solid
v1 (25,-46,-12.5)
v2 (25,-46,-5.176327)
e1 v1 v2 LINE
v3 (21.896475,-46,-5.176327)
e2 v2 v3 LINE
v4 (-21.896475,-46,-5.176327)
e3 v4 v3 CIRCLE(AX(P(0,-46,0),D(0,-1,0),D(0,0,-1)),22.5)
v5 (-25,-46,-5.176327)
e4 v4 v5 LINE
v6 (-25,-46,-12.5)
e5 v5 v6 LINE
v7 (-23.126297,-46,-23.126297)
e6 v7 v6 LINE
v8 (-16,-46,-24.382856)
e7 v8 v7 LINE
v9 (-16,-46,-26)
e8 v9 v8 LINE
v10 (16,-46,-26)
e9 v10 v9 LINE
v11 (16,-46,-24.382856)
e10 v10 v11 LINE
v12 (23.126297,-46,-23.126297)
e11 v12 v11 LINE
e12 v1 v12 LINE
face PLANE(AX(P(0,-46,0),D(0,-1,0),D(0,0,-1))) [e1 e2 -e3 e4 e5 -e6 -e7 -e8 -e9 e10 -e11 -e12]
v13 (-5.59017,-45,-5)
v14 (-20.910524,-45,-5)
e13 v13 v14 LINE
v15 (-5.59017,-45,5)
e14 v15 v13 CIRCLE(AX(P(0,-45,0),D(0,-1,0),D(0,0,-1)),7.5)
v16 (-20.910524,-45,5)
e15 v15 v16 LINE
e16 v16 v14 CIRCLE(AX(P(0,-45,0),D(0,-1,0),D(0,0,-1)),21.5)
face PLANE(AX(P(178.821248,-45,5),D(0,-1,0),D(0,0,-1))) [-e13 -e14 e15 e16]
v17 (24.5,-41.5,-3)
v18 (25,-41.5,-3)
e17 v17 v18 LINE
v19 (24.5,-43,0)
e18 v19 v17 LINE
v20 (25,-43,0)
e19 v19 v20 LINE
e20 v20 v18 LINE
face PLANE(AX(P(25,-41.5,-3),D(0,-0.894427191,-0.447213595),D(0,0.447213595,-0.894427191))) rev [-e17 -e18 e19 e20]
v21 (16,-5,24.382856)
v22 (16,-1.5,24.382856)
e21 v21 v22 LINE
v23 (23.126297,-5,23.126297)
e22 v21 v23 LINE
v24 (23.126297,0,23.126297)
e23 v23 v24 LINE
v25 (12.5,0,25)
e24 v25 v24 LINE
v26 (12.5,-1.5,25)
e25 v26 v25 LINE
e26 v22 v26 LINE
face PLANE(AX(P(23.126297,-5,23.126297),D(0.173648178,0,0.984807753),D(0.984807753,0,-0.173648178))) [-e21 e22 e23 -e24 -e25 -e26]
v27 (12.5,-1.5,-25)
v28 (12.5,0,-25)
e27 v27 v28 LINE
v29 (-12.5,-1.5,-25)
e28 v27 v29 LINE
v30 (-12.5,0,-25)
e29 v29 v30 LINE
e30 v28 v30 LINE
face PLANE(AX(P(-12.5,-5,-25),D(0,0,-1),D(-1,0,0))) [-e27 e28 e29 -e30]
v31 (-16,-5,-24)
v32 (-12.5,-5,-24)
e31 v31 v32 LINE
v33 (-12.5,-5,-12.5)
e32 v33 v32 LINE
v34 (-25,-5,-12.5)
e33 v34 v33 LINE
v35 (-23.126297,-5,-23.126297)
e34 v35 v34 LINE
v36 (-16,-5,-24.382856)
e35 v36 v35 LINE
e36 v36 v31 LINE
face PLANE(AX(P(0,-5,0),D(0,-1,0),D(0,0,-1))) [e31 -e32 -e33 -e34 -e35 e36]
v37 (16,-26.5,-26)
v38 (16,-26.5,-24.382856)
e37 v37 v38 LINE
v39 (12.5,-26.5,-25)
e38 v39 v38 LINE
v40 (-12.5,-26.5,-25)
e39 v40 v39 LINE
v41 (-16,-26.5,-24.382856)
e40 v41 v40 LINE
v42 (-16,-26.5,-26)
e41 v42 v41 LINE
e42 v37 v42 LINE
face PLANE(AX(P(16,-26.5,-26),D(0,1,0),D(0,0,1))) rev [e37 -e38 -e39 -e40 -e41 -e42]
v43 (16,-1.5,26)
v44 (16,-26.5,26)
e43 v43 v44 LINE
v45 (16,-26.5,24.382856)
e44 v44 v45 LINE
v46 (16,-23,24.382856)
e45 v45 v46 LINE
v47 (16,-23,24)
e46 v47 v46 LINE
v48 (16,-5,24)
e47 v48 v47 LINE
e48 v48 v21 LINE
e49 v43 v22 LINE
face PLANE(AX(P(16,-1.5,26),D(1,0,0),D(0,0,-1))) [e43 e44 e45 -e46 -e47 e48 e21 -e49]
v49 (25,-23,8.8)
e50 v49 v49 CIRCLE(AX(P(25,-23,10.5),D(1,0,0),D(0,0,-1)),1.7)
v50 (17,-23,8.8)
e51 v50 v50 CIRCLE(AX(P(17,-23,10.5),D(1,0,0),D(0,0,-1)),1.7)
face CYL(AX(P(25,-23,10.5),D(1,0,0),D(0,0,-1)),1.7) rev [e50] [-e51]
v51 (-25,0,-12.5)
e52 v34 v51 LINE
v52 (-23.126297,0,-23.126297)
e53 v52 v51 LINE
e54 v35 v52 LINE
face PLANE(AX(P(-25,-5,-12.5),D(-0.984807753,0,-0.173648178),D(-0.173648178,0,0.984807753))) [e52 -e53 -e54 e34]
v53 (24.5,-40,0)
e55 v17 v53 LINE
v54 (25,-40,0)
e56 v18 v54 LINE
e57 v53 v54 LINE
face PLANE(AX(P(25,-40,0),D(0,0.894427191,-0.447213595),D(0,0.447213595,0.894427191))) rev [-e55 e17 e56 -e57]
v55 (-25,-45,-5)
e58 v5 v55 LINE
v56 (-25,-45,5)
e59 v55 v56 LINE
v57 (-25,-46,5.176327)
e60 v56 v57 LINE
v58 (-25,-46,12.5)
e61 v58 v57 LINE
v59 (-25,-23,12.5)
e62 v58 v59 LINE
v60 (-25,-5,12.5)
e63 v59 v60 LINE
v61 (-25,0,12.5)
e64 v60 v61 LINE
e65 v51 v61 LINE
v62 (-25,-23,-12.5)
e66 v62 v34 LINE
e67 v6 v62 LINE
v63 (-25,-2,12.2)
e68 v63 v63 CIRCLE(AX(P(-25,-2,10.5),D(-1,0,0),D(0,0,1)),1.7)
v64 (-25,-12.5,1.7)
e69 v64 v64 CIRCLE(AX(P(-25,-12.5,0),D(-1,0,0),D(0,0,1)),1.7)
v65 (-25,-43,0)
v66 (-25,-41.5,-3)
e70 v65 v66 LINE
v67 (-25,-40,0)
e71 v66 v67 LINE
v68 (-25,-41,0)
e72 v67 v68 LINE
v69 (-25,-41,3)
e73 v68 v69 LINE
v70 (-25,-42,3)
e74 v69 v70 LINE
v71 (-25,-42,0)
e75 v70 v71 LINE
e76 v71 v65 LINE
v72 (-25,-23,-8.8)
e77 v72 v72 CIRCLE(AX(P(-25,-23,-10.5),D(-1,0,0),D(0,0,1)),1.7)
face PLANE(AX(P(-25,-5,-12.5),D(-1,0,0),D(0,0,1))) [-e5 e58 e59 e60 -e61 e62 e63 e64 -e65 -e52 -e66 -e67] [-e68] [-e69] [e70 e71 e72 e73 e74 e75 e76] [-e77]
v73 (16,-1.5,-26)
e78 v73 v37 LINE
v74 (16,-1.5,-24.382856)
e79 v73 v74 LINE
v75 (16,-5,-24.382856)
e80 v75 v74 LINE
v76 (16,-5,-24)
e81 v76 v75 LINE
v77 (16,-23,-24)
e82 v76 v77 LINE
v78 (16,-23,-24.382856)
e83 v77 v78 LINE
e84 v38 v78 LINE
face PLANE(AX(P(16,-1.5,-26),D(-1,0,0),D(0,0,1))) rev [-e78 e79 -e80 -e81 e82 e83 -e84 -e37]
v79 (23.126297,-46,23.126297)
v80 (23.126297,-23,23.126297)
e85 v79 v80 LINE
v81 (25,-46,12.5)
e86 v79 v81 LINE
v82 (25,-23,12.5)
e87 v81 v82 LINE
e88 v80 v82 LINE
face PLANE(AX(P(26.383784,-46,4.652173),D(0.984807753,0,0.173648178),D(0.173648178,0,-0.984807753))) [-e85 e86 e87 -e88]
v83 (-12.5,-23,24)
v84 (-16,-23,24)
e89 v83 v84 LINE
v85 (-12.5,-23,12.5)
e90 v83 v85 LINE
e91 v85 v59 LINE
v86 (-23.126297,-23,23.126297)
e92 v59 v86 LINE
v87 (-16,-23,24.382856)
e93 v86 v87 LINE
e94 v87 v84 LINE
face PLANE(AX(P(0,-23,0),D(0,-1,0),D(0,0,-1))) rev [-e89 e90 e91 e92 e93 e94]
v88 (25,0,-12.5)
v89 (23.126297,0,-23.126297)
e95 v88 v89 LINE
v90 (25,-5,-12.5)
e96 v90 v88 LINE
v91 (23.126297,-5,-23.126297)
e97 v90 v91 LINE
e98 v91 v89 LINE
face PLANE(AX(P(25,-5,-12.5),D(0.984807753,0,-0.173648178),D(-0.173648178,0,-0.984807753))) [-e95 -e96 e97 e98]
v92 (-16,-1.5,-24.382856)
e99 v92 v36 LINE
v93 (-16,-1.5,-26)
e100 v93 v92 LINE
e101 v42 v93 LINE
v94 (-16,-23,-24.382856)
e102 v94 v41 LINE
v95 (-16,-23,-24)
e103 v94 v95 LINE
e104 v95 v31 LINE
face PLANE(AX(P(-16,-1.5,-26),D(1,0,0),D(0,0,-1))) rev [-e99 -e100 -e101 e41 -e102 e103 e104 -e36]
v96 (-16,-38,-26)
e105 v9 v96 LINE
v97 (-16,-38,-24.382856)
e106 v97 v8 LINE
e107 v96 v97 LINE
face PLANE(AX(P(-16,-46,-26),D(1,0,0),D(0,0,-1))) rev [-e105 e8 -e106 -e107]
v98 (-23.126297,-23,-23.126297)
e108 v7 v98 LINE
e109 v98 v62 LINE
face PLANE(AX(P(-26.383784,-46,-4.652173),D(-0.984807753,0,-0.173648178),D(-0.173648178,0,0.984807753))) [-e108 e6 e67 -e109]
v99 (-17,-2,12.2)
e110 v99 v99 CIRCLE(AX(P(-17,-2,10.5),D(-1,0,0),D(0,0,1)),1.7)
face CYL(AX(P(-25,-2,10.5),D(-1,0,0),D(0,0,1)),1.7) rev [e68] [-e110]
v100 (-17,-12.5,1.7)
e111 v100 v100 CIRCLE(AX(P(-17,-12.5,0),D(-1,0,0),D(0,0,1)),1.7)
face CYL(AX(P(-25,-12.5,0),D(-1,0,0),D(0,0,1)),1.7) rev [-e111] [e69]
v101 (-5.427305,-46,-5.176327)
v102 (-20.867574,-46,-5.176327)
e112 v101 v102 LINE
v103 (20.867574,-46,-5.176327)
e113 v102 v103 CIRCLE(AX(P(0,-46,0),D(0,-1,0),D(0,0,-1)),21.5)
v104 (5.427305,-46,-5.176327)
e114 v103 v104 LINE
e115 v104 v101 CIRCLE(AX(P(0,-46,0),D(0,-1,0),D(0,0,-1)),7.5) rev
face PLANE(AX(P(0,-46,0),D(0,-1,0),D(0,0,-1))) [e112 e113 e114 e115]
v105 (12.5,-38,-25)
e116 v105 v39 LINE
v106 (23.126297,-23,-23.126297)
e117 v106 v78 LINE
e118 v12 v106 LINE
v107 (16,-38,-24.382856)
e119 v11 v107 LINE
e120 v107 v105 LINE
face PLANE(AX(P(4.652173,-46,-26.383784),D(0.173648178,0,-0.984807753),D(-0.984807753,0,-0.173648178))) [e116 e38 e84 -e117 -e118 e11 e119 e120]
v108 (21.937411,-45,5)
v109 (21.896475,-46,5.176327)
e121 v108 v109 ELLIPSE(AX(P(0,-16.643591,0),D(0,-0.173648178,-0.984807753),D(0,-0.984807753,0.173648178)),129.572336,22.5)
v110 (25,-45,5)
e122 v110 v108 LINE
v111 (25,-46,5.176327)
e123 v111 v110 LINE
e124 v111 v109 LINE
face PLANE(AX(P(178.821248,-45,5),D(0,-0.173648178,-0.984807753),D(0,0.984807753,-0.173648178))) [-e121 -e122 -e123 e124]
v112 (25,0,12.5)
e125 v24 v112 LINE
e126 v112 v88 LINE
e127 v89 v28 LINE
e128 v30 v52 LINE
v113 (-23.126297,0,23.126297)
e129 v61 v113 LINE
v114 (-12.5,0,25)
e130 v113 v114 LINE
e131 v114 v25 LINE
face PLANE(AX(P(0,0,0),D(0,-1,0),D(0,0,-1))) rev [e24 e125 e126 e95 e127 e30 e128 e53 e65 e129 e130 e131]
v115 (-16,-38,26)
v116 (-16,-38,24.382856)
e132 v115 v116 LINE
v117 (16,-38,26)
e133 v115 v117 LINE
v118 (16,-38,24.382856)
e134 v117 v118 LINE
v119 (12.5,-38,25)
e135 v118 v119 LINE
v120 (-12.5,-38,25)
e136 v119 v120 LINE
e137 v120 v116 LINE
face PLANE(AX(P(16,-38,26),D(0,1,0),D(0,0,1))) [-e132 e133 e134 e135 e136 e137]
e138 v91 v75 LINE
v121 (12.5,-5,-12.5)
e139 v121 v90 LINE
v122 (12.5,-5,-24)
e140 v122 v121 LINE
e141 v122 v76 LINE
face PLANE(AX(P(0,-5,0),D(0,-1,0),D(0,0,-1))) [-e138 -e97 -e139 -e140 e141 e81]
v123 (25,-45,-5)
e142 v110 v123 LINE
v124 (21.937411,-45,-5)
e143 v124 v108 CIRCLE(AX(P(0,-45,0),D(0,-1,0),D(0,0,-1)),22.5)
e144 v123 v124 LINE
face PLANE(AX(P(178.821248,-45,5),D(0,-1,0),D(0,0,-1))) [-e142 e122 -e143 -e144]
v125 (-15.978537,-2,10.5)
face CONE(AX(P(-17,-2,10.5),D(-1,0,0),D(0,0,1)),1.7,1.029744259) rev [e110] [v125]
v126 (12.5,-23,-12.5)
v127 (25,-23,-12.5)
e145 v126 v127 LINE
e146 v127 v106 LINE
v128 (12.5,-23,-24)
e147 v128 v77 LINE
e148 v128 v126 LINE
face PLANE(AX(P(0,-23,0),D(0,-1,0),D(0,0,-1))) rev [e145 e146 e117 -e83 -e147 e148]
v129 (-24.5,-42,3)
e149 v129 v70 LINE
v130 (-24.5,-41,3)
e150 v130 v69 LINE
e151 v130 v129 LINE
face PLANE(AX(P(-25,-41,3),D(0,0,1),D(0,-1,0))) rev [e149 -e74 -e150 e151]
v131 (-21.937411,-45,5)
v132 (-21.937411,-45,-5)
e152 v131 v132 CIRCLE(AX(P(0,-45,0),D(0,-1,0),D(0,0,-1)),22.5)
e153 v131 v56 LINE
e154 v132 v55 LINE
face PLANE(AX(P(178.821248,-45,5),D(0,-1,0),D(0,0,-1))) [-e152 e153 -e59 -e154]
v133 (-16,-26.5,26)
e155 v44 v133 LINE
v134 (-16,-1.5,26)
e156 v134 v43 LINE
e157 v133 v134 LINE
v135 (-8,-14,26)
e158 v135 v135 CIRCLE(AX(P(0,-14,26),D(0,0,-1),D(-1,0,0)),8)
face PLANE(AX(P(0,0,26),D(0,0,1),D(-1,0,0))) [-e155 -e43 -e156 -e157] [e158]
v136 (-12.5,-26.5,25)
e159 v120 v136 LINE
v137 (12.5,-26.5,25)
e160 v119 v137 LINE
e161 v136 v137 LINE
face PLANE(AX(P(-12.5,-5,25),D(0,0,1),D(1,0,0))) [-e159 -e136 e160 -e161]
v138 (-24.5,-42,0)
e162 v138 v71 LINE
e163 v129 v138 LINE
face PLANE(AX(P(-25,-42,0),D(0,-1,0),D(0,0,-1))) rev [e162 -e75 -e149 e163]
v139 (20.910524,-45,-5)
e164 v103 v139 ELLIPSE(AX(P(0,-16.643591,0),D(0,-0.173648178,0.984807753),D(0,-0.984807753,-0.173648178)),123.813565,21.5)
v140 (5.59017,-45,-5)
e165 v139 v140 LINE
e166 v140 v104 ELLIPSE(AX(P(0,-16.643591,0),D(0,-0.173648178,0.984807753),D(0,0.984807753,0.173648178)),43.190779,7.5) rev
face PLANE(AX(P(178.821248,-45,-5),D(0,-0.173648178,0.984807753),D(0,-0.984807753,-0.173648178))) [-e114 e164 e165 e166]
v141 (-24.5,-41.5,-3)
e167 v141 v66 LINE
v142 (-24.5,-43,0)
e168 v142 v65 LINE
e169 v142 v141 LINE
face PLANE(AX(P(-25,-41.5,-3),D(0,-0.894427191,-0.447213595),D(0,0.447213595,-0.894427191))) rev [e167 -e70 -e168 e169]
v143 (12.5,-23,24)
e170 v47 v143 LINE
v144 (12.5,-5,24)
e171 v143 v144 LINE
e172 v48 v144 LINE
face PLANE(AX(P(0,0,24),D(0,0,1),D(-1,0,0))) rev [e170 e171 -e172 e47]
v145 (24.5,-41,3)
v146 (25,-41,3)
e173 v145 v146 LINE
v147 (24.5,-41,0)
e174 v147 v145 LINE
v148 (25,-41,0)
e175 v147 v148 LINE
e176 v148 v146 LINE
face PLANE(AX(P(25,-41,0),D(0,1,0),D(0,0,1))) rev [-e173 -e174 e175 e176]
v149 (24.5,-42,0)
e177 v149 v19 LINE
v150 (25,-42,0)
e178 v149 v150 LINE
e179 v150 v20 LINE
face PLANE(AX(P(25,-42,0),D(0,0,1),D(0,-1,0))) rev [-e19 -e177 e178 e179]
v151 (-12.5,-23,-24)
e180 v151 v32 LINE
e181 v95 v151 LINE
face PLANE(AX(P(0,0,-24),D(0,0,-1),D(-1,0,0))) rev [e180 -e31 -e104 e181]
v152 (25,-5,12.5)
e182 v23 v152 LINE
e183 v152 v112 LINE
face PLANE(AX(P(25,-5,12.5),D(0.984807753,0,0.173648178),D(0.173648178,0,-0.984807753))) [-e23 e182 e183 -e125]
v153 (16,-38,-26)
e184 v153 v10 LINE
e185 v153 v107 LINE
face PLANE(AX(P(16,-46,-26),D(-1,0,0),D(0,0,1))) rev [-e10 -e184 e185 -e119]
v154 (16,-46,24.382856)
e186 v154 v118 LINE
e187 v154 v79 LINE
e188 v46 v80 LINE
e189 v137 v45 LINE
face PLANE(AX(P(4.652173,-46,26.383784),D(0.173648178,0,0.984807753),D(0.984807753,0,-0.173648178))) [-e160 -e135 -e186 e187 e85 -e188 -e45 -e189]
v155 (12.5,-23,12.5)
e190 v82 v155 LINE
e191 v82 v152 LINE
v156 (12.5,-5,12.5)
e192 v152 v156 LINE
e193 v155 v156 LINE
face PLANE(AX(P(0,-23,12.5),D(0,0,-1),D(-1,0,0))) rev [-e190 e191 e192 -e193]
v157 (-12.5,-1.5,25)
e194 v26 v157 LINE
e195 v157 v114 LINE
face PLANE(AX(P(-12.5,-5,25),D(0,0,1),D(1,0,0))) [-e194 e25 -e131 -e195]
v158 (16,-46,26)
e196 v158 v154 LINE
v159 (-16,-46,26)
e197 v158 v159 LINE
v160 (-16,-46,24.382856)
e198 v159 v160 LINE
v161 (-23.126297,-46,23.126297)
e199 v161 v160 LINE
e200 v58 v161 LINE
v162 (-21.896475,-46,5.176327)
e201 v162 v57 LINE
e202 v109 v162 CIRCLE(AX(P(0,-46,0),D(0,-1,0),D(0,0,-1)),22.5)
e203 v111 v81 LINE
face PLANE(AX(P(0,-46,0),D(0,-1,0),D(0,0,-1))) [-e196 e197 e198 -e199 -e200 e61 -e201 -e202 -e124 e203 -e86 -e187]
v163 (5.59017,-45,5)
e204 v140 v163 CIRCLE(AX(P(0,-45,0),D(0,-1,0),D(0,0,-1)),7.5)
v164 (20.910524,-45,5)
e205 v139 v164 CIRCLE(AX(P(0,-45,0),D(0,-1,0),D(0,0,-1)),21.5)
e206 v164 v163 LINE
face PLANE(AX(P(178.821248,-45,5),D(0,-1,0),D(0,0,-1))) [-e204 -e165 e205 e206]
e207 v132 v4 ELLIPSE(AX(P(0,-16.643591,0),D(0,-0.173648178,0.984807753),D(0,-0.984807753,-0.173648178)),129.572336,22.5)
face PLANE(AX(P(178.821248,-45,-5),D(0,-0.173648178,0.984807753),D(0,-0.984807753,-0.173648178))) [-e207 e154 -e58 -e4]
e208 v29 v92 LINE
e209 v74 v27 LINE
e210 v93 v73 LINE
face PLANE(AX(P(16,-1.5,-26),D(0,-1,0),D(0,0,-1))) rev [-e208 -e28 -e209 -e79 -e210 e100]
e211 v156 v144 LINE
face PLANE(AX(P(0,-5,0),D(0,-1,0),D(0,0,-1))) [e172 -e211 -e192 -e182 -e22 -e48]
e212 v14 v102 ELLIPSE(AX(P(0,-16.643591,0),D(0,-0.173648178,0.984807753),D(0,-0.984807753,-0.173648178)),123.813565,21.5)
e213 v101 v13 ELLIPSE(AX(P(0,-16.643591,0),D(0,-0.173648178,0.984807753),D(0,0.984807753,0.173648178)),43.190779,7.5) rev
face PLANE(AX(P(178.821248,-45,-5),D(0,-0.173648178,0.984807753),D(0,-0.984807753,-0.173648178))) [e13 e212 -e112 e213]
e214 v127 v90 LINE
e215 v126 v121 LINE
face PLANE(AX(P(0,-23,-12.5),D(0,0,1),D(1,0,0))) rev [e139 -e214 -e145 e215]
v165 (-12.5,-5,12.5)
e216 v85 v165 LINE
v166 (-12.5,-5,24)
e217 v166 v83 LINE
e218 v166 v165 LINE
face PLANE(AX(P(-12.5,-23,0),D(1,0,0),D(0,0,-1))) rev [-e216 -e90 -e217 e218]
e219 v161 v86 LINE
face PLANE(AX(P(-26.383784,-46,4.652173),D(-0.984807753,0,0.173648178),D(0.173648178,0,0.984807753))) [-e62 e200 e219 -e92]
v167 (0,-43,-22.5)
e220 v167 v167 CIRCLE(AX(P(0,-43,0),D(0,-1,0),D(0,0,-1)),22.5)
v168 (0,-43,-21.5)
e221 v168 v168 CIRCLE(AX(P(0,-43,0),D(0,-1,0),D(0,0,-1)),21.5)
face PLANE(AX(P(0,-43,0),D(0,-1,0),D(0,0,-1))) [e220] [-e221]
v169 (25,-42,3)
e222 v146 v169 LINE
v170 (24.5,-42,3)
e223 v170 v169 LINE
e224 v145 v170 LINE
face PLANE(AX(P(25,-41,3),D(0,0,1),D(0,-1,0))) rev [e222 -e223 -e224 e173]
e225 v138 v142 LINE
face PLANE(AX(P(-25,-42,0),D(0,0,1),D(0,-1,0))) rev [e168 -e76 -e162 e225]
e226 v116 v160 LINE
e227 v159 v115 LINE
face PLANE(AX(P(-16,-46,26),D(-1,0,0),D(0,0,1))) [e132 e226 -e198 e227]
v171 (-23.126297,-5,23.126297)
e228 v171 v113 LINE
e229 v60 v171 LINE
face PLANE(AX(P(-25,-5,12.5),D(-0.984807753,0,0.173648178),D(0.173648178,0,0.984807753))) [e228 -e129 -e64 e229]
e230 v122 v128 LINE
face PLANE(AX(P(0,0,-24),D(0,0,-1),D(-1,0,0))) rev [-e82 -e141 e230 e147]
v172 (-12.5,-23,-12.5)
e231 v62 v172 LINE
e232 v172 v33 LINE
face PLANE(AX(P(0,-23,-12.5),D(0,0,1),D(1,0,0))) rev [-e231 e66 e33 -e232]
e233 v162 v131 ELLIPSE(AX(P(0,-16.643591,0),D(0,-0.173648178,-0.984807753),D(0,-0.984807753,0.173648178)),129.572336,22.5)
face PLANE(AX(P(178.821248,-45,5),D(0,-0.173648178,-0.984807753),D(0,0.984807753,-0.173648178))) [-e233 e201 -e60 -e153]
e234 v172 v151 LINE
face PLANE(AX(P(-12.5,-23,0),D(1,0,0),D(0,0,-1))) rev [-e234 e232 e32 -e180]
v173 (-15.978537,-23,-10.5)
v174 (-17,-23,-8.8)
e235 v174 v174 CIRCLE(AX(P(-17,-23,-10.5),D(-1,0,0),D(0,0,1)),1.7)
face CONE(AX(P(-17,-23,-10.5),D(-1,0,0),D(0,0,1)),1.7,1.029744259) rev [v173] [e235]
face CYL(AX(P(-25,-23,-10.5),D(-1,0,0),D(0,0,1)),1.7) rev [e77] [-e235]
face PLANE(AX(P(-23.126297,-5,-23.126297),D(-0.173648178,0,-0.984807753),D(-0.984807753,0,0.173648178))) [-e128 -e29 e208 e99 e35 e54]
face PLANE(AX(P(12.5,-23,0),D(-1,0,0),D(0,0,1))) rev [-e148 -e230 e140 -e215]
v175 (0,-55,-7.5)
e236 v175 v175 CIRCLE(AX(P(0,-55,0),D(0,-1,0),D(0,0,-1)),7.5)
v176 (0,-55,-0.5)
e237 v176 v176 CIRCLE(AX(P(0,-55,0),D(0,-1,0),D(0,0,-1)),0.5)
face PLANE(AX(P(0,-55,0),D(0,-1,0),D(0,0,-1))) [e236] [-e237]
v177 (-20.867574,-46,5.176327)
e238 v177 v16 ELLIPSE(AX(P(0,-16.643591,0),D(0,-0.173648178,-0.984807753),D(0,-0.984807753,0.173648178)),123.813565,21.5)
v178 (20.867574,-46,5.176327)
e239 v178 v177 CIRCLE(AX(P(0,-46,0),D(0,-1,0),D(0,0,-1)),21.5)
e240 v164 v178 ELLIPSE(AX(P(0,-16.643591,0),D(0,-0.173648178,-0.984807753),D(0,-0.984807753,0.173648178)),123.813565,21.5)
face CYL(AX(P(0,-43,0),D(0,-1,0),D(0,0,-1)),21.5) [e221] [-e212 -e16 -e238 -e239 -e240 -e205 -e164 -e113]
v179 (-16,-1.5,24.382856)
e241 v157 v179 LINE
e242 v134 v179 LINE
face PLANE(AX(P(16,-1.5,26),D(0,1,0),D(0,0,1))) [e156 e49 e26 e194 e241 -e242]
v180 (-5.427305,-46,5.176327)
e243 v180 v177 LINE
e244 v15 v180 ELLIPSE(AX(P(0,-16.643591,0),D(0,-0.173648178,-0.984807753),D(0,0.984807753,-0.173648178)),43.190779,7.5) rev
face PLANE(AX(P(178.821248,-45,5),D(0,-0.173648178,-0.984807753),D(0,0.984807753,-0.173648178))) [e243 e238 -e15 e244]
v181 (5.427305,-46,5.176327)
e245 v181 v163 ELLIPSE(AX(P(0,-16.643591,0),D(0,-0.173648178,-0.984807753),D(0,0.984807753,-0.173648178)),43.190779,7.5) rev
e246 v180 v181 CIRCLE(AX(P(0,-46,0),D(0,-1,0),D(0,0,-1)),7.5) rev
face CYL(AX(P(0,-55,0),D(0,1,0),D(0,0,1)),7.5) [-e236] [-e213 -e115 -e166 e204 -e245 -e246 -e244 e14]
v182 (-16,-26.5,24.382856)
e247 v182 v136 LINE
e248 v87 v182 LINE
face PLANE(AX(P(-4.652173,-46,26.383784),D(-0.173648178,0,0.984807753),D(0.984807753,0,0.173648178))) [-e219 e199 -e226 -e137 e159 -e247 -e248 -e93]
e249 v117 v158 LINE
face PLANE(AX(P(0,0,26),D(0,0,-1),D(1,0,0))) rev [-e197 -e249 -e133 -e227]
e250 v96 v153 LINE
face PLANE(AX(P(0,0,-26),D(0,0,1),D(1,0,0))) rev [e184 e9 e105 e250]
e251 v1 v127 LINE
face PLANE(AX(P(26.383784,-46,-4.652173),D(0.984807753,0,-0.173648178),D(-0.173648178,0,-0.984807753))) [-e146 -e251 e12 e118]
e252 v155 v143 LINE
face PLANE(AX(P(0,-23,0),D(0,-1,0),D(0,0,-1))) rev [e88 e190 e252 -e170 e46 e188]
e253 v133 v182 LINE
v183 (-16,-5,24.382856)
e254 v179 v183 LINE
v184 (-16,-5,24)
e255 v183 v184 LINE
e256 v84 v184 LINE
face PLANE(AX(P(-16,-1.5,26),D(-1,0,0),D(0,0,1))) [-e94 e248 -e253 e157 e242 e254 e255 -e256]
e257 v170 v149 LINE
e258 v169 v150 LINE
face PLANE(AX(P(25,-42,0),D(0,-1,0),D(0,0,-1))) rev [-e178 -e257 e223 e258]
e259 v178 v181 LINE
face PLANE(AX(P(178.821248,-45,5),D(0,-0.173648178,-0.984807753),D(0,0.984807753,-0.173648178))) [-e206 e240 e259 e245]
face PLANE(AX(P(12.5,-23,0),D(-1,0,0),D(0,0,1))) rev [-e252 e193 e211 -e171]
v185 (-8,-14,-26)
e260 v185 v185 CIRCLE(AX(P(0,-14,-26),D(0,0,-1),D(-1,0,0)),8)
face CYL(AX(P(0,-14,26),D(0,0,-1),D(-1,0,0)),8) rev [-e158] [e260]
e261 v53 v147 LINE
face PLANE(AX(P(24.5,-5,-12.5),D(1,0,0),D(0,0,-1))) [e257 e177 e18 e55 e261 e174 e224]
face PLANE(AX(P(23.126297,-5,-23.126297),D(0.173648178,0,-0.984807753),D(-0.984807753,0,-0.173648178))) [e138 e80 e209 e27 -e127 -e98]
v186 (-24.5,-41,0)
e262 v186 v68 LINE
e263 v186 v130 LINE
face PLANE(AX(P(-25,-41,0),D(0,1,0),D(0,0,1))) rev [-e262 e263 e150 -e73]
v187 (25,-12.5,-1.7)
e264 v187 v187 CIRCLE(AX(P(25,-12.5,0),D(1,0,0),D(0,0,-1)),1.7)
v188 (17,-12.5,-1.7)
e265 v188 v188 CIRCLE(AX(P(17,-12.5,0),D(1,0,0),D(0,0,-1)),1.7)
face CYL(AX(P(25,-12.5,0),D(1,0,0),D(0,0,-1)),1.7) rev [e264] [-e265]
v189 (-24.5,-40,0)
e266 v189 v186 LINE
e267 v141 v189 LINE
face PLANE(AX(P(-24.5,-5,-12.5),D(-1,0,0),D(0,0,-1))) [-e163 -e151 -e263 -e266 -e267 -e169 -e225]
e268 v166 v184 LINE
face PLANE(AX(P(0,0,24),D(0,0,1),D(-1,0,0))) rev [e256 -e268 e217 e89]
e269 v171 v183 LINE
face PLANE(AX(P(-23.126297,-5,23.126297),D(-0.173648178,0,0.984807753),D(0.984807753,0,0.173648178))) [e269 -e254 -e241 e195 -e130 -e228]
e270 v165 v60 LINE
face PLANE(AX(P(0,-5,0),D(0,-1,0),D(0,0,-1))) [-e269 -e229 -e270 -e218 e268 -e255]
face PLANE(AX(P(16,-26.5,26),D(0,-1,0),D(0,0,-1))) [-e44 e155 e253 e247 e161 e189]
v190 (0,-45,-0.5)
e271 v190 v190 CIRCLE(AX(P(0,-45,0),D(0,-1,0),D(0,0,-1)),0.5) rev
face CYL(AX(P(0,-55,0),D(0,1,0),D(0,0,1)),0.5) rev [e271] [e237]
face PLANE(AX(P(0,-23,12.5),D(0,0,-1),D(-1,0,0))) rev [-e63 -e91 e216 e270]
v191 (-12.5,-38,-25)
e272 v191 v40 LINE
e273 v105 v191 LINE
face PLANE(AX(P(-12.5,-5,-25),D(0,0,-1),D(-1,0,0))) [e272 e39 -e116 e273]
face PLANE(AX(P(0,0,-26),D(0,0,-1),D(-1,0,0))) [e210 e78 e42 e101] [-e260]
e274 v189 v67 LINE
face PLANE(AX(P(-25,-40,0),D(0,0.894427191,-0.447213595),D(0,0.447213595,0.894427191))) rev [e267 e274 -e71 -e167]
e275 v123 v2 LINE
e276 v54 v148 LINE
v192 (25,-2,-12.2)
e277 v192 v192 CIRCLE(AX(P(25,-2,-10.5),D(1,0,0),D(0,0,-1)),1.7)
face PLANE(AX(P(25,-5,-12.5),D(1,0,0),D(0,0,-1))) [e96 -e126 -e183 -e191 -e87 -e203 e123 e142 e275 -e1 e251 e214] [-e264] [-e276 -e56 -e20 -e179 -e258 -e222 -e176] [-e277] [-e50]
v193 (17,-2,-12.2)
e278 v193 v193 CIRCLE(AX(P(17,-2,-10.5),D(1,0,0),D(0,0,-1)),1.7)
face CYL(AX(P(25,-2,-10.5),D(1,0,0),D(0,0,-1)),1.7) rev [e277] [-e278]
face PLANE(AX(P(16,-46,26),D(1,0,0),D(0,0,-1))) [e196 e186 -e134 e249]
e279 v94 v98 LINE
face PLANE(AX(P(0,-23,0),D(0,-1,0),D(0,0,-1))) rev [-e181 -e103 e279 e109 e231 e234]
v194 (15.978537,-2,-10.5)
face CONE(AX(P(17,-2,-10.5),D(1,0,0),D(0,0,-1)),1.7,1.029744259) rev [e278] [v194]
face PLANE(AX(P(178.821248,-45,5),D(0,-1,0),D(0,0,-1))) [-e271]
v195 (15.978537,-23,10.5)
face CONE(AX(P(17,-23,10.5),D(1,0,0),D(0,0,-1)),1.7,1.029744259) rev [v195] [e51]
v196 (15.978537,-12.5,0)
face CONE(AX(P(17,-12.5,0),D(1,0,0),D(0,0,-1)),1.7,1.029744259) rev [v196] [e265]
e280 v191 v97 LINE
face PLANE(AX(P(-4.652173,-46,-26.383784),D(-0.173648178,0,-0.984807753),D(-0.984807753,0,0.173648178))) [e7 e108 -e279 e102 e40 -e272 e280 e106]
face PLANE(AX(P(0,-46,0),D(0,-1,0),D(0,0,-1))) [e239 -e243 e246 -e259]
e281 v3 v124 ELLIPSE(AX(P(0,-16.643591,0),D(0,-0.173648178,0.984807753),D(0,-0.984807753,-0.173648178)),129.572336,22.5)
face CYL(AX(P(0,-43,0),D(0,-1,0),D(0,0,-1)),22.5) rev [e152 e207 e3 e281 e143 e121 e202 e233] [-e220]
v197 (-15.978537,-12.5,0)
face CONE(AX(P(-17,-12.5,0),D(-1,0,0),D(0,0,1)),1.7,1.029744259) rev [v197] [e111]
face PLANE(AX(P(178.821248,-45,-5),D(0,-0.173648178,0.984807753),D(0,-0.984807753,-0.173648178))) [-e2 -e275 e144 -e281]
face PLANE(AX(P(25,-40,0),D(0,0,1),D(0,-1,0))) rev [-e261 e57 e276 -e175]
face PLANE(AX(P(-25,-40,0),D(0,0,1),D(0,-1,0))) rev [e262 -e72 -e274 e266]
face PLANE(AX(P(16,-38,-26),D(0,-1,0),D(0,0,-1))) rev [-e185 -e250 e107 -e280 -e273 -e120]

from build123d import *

# Parameters (mm, degrees)
BOSS_EXTRUDE1_DEPTH      = 5
BOSS_EXTRUDE2_DEPTH      = 18
BOSS_EXTRUDE3_DEPTH      = 23
SKETCH4_W                = 32
SKETCH4_H                = 25
SKETCH4_H_2              = 8
BOSS_EXTRUDE4_DEPTH      = 1
CUT_EXTRUDE1_DEPTH       = 73.746133918
CUT_EXTRUDE1_DEPTH_BACK  = 73.746133918
WRAP1_START              = -0.5
WRAP1_DEPTH              = 0.5
SKETCH8_R                = 7.5
SKETCH8_R_2              = 0.5
BOSS_EXTRUDE5_DEPTH      = 10
SKETCH9_R                = 8
CUT_EXTRUDE2_DEPTH       = 80.711981534
M3_CLEARANCE_HOLE1_D     = 3.4
M3_CLEARANCE_HOLE1_DEPTH = 8
M3_CLEARANCE_HOLE1_TIP   = 1.021463052
M3_CLEARANCE_HOLE2_D     = 3.4
M3_CLEARANCE_HOLE2_DEPTH = 8
M3_CLEARANCE_HOLE2_TIP   = 1.021463052
M3_CLEARANCE_HOLE3_D     = 3.4
M3_CLEARANCE_HOLE3_DEPTH = 8
M3_CLEARANCE_HOLE3_TIP   = 1.021463052
M3_CLEARANCE_HOLE4_D     = 3.4
M3_CLEARANCE_HOLE4_DEPTH = 8
M3_CLEARANCE_HOLE4_TIP   = 1.021463052
SKETCH22_R               = 22.5
SKETCH22_R_2             = 21.5
CUT_EXTRUDE3_DEPTH       = 3


# Read off the part's stored shape, not the designer's step: Wrap1
with BuildPart() as part:
    # Sketch1 → Boss-Extrude1 (new body)
    with BuildSketch(Plane(origin=(0, 0, 0), x_dir=(1, 0, 0), z_dir=(0, 1, 0))):
        Polygon((-25, 12.5), (-23.126297114, 23.126297114), (-12.5, 25), (12.5, 25), (23.126297114, 23.126297114), (25, 12.5), (25, -12.5), (23.126297114, -23.126297114), (12.5, -25), (-12.5, -25), (-23.126297114, -23.126297114), (-25, -12.5), align=None)
    extrude(amount=-BOSS_EXTRUDE1_DEPTH)

    # Sketch2 → Boss-Extrude2 (add)
    with BuildSketch(Plane.XZ.offset(5)):
        Polygon((-12.5, 25), (-12.5, 12.5), (-25, 12.5), (-25, -12.5), (-12.5, -12.5), (-12.5, -25), (12.5, -25), (12.5, -12.5), (25, -12.5), (25, 12.5), (12.5, 12.5), (12.5, 25), align=None)
    extrude(amount=BOSS_EXTRUDE2_DEPTH)

    # Sketch3 → Boss-Extrude3 (add)
    with BuildSketch(Plane.XZ.offset(23)):
        Polygon((12.5, 25), (-12.5, 25), (-12.5, 12.5), (-25, 12.5), (-25, -12.5), (-12.5, -12.5), (-12.5, -25), (12.5, -25), (12.5, -12.5), (25, -12.5), (25, 12.5), (12.5, 12.5), align=None)
        Polygon((-25, 12.5), (-23.126297114, 23.126297114), (-12.5, 25), (-12.5, 12.5), align=None)
        Polygon((12.5, 25), (23.126297114, 23.126297114), (25, 12.5), (12.5, 12.5), align=None)
        Polygon((-12.5, -25), (-23.126297114, -23.126297114), (-25, -12.5), (-12.5, -12.5), align=None)
        Polygon((25, -12.5), (23.126297114, -23.126297114), (12.5, -25), (12.5, -12.5), align=None)
    extrude(amount=BOSS_EXTRUDE3_DEPTH)

    # Sketch4 → Boss-Extrude4 (add, symmetric)
    with BuildSketch(Plane(origin=(0, 0, -25), x_dir=(-1, 0, 0), z_dir=(0, 0, -1))):
        with Locations((0, -14)):
            Rectangle(SKETCH4_W, SKETCH4_H)
        with Locations((0, -42)):
            Rectangle(SKETCH4_W, SKETCH4_H_2)
    boss_extrude4 = extrude(amount=BOSS_EXTRUDE4_DEPTH, both=True)

    # Mirror2: Boss-Extrude4 across plane
    add(boss_extrude4.mirror(Plane.XY))

    # Sketch6 → Cut-Extrude1 (cut, two sides: drawn at the far end of the back side and taken through both)
    with BuildSketch(Plane(origin=(25, 0, 0), x_dir=(0, 0, -1), z_dir=(1, 0, 0)).offset(-CUT_EXTRUDE1_DEPTH_BACK)):
        Polygon((5, -45), (-5, -45), (-5.176326981, -46), (5.176326981, -46), align=None)
    extrude(amount=CUT_EXTRUDE1_DEPTH + CUT_EXTRUDE1_DEPTH_BACK, mode=Mode.SUBTRACT)

    # Wrap1 outline → Wrap1 (cut)
    with BuildSketch(Plane(origin=(25, 0, 0), x_dir=(0, 0, -1), z_dir=(1, 0, 0)).offset(WRAP1_START)):
        Polygon((0, -41), (-3, -41), (-3, -42), (0, -42), (0, -43), (3, -41.5), (0, -40), align=None)
    wrap1 = extrude(amount=WRAP1_DEPTH, mode=Mode.SUBTRACT)

    # Mirror3: Wrap1 across plane
    add(wrap1.mirror(Plane(origin=(0, 0, 0), x_dir=(0, 0, 1), z_dir=(1, 0, 0))), mode=Mode.SUBTRACT)

    # Sketch8 → Boss-Extrude5 (add)
    with BuildSketch(Plane.XZ.offset(45)):
        with Locations(Location((0, 0, 0), (0, 0, 43.644116102))):
            Circle(SKETCH8_R)
        with Locations(Location((0, 0, 0), (0, 0, 270))):
            Circle(SKETCH8_R_2, mode=Mode.SUBTRACT)
    extrude(amount=BOSS_EXTRUDE5_DEPTH)

    # Sketch9 → Cut-Extrude2 (cut, through all)
    with BuildSketch(Plane(origin=(0, 0, -26), x_dir=(-1, 0, 0), z_dir=(0, 0, -1))):
        with Locations((0, -14)):
            Circle(SKETCH9_R)
    extrude(amount=-CUT_EXTRUDE2_DEPTH, mode=Mode.SUBTRACT)

    # M3 Clearance Hole1
    with Locations(Plane(origin=(25, 0, 0), x_dir=(0, 0, -1), z_dir=(1, 0, 0))):
        with Locations((10.5, -2), (-10.5, -23)):
            Hole(M3_CLEARANCE_HOLE1_D / 2, depth=M3_CLEARANCE_HOLE1_DEPTH)
            with Locations((0, 0, -(M3_CLEARANCE_HOLE1_DEPTH + M3_CLEARANCE_HOLE1_TIP / 2))):  # 118° drill point
                Cone(0, M3_CLEARANCE_HOLE1_D / 2, M3_CLEARANCE_HOLE1_TIP, mode=Mode.SUBTRACT)

    # M3 Clearance Hole2
    with Locations(Plane.ZY.offset(25)):
        with Locations((10.5, -2), (-10.5, -23)):
            Hole(M3_CLEARANCE_HOLE2_D / 2, depth=M3_CLEARANCE_HOLE2_DEPTH)
            with Locations((0, 0, -(M3_CLEARANCE_HOLE2_DEPTH + M3_CLEARANCE_HOLE2_TIP / 2))):  # 118° drill point
                Cone(0, M3_CLEARANCE_HOLE2_D / 2, M3_CLEARANCE_HOLE2_TIP, mode=Mode.SUBTRACT)

    # M3 Clearance Hole3
    with Locations(Plane(origin=(25, 0, 0), x_dir=(0, 0, -1), z_dir=(1, 0, 0))):
        with Locations((0, -12.5)):
            Hole(M3_CLEARANCE_HOLE3_D / 2, depth=M3_CLEARANCE_HOLE3_DEPTH)
            with Locations((0, 0, -(M3_CLEARANCE_HOLE3_DEPTH + M3_CLEARANCE_HOLE3_TIP / 2))):  # 118° drill point
                Cone(0, M3_CLEARANCE_HOLE3_D / 2, M3_CLEARANCE_HOLE3_TIP, mode=Mode.SUBTRACT)

    # M3 Clearance Hole4
    with Locations(Plane.ZY.offset(25)):
        with Locations((0, -12.5)):
            Hole(M3_CLEARANCE_HOLE4_D / 2, depth=M3_CLEARANCE_HOLE4_DEPTH)
            with Locations((0, 0, -(M3_CLEARANCE_HOLE4_DEPTH + M3_CLEARANCE_HOLE4_TIP / 2))):  # 118° drill point
                Cone(0, M3_CLEARANCE_HOLE4_D / 2, M3_CLEARANCE_HOLE4_TIP, mode=Mode.SUBTRACT)

    # Sketch22 → Cut-Extrude3 (cut)
    with BuildSketch(Plane.XZ.offset(46)):
        with Locations(Location((0, 0, 0), (0, 0, 270))):
            Circle(SKETCH22_R)
        with Locations(Location((0, 0, 0), (0, 0, 270))):
            Circle(SKETCH22_R_2, mode=Mode.SUBTRACT)
    extrude(amount=-CUT_EXTRUDE3_DEPTH, mode=Mode.SUBTRACT)


solid = part.part
